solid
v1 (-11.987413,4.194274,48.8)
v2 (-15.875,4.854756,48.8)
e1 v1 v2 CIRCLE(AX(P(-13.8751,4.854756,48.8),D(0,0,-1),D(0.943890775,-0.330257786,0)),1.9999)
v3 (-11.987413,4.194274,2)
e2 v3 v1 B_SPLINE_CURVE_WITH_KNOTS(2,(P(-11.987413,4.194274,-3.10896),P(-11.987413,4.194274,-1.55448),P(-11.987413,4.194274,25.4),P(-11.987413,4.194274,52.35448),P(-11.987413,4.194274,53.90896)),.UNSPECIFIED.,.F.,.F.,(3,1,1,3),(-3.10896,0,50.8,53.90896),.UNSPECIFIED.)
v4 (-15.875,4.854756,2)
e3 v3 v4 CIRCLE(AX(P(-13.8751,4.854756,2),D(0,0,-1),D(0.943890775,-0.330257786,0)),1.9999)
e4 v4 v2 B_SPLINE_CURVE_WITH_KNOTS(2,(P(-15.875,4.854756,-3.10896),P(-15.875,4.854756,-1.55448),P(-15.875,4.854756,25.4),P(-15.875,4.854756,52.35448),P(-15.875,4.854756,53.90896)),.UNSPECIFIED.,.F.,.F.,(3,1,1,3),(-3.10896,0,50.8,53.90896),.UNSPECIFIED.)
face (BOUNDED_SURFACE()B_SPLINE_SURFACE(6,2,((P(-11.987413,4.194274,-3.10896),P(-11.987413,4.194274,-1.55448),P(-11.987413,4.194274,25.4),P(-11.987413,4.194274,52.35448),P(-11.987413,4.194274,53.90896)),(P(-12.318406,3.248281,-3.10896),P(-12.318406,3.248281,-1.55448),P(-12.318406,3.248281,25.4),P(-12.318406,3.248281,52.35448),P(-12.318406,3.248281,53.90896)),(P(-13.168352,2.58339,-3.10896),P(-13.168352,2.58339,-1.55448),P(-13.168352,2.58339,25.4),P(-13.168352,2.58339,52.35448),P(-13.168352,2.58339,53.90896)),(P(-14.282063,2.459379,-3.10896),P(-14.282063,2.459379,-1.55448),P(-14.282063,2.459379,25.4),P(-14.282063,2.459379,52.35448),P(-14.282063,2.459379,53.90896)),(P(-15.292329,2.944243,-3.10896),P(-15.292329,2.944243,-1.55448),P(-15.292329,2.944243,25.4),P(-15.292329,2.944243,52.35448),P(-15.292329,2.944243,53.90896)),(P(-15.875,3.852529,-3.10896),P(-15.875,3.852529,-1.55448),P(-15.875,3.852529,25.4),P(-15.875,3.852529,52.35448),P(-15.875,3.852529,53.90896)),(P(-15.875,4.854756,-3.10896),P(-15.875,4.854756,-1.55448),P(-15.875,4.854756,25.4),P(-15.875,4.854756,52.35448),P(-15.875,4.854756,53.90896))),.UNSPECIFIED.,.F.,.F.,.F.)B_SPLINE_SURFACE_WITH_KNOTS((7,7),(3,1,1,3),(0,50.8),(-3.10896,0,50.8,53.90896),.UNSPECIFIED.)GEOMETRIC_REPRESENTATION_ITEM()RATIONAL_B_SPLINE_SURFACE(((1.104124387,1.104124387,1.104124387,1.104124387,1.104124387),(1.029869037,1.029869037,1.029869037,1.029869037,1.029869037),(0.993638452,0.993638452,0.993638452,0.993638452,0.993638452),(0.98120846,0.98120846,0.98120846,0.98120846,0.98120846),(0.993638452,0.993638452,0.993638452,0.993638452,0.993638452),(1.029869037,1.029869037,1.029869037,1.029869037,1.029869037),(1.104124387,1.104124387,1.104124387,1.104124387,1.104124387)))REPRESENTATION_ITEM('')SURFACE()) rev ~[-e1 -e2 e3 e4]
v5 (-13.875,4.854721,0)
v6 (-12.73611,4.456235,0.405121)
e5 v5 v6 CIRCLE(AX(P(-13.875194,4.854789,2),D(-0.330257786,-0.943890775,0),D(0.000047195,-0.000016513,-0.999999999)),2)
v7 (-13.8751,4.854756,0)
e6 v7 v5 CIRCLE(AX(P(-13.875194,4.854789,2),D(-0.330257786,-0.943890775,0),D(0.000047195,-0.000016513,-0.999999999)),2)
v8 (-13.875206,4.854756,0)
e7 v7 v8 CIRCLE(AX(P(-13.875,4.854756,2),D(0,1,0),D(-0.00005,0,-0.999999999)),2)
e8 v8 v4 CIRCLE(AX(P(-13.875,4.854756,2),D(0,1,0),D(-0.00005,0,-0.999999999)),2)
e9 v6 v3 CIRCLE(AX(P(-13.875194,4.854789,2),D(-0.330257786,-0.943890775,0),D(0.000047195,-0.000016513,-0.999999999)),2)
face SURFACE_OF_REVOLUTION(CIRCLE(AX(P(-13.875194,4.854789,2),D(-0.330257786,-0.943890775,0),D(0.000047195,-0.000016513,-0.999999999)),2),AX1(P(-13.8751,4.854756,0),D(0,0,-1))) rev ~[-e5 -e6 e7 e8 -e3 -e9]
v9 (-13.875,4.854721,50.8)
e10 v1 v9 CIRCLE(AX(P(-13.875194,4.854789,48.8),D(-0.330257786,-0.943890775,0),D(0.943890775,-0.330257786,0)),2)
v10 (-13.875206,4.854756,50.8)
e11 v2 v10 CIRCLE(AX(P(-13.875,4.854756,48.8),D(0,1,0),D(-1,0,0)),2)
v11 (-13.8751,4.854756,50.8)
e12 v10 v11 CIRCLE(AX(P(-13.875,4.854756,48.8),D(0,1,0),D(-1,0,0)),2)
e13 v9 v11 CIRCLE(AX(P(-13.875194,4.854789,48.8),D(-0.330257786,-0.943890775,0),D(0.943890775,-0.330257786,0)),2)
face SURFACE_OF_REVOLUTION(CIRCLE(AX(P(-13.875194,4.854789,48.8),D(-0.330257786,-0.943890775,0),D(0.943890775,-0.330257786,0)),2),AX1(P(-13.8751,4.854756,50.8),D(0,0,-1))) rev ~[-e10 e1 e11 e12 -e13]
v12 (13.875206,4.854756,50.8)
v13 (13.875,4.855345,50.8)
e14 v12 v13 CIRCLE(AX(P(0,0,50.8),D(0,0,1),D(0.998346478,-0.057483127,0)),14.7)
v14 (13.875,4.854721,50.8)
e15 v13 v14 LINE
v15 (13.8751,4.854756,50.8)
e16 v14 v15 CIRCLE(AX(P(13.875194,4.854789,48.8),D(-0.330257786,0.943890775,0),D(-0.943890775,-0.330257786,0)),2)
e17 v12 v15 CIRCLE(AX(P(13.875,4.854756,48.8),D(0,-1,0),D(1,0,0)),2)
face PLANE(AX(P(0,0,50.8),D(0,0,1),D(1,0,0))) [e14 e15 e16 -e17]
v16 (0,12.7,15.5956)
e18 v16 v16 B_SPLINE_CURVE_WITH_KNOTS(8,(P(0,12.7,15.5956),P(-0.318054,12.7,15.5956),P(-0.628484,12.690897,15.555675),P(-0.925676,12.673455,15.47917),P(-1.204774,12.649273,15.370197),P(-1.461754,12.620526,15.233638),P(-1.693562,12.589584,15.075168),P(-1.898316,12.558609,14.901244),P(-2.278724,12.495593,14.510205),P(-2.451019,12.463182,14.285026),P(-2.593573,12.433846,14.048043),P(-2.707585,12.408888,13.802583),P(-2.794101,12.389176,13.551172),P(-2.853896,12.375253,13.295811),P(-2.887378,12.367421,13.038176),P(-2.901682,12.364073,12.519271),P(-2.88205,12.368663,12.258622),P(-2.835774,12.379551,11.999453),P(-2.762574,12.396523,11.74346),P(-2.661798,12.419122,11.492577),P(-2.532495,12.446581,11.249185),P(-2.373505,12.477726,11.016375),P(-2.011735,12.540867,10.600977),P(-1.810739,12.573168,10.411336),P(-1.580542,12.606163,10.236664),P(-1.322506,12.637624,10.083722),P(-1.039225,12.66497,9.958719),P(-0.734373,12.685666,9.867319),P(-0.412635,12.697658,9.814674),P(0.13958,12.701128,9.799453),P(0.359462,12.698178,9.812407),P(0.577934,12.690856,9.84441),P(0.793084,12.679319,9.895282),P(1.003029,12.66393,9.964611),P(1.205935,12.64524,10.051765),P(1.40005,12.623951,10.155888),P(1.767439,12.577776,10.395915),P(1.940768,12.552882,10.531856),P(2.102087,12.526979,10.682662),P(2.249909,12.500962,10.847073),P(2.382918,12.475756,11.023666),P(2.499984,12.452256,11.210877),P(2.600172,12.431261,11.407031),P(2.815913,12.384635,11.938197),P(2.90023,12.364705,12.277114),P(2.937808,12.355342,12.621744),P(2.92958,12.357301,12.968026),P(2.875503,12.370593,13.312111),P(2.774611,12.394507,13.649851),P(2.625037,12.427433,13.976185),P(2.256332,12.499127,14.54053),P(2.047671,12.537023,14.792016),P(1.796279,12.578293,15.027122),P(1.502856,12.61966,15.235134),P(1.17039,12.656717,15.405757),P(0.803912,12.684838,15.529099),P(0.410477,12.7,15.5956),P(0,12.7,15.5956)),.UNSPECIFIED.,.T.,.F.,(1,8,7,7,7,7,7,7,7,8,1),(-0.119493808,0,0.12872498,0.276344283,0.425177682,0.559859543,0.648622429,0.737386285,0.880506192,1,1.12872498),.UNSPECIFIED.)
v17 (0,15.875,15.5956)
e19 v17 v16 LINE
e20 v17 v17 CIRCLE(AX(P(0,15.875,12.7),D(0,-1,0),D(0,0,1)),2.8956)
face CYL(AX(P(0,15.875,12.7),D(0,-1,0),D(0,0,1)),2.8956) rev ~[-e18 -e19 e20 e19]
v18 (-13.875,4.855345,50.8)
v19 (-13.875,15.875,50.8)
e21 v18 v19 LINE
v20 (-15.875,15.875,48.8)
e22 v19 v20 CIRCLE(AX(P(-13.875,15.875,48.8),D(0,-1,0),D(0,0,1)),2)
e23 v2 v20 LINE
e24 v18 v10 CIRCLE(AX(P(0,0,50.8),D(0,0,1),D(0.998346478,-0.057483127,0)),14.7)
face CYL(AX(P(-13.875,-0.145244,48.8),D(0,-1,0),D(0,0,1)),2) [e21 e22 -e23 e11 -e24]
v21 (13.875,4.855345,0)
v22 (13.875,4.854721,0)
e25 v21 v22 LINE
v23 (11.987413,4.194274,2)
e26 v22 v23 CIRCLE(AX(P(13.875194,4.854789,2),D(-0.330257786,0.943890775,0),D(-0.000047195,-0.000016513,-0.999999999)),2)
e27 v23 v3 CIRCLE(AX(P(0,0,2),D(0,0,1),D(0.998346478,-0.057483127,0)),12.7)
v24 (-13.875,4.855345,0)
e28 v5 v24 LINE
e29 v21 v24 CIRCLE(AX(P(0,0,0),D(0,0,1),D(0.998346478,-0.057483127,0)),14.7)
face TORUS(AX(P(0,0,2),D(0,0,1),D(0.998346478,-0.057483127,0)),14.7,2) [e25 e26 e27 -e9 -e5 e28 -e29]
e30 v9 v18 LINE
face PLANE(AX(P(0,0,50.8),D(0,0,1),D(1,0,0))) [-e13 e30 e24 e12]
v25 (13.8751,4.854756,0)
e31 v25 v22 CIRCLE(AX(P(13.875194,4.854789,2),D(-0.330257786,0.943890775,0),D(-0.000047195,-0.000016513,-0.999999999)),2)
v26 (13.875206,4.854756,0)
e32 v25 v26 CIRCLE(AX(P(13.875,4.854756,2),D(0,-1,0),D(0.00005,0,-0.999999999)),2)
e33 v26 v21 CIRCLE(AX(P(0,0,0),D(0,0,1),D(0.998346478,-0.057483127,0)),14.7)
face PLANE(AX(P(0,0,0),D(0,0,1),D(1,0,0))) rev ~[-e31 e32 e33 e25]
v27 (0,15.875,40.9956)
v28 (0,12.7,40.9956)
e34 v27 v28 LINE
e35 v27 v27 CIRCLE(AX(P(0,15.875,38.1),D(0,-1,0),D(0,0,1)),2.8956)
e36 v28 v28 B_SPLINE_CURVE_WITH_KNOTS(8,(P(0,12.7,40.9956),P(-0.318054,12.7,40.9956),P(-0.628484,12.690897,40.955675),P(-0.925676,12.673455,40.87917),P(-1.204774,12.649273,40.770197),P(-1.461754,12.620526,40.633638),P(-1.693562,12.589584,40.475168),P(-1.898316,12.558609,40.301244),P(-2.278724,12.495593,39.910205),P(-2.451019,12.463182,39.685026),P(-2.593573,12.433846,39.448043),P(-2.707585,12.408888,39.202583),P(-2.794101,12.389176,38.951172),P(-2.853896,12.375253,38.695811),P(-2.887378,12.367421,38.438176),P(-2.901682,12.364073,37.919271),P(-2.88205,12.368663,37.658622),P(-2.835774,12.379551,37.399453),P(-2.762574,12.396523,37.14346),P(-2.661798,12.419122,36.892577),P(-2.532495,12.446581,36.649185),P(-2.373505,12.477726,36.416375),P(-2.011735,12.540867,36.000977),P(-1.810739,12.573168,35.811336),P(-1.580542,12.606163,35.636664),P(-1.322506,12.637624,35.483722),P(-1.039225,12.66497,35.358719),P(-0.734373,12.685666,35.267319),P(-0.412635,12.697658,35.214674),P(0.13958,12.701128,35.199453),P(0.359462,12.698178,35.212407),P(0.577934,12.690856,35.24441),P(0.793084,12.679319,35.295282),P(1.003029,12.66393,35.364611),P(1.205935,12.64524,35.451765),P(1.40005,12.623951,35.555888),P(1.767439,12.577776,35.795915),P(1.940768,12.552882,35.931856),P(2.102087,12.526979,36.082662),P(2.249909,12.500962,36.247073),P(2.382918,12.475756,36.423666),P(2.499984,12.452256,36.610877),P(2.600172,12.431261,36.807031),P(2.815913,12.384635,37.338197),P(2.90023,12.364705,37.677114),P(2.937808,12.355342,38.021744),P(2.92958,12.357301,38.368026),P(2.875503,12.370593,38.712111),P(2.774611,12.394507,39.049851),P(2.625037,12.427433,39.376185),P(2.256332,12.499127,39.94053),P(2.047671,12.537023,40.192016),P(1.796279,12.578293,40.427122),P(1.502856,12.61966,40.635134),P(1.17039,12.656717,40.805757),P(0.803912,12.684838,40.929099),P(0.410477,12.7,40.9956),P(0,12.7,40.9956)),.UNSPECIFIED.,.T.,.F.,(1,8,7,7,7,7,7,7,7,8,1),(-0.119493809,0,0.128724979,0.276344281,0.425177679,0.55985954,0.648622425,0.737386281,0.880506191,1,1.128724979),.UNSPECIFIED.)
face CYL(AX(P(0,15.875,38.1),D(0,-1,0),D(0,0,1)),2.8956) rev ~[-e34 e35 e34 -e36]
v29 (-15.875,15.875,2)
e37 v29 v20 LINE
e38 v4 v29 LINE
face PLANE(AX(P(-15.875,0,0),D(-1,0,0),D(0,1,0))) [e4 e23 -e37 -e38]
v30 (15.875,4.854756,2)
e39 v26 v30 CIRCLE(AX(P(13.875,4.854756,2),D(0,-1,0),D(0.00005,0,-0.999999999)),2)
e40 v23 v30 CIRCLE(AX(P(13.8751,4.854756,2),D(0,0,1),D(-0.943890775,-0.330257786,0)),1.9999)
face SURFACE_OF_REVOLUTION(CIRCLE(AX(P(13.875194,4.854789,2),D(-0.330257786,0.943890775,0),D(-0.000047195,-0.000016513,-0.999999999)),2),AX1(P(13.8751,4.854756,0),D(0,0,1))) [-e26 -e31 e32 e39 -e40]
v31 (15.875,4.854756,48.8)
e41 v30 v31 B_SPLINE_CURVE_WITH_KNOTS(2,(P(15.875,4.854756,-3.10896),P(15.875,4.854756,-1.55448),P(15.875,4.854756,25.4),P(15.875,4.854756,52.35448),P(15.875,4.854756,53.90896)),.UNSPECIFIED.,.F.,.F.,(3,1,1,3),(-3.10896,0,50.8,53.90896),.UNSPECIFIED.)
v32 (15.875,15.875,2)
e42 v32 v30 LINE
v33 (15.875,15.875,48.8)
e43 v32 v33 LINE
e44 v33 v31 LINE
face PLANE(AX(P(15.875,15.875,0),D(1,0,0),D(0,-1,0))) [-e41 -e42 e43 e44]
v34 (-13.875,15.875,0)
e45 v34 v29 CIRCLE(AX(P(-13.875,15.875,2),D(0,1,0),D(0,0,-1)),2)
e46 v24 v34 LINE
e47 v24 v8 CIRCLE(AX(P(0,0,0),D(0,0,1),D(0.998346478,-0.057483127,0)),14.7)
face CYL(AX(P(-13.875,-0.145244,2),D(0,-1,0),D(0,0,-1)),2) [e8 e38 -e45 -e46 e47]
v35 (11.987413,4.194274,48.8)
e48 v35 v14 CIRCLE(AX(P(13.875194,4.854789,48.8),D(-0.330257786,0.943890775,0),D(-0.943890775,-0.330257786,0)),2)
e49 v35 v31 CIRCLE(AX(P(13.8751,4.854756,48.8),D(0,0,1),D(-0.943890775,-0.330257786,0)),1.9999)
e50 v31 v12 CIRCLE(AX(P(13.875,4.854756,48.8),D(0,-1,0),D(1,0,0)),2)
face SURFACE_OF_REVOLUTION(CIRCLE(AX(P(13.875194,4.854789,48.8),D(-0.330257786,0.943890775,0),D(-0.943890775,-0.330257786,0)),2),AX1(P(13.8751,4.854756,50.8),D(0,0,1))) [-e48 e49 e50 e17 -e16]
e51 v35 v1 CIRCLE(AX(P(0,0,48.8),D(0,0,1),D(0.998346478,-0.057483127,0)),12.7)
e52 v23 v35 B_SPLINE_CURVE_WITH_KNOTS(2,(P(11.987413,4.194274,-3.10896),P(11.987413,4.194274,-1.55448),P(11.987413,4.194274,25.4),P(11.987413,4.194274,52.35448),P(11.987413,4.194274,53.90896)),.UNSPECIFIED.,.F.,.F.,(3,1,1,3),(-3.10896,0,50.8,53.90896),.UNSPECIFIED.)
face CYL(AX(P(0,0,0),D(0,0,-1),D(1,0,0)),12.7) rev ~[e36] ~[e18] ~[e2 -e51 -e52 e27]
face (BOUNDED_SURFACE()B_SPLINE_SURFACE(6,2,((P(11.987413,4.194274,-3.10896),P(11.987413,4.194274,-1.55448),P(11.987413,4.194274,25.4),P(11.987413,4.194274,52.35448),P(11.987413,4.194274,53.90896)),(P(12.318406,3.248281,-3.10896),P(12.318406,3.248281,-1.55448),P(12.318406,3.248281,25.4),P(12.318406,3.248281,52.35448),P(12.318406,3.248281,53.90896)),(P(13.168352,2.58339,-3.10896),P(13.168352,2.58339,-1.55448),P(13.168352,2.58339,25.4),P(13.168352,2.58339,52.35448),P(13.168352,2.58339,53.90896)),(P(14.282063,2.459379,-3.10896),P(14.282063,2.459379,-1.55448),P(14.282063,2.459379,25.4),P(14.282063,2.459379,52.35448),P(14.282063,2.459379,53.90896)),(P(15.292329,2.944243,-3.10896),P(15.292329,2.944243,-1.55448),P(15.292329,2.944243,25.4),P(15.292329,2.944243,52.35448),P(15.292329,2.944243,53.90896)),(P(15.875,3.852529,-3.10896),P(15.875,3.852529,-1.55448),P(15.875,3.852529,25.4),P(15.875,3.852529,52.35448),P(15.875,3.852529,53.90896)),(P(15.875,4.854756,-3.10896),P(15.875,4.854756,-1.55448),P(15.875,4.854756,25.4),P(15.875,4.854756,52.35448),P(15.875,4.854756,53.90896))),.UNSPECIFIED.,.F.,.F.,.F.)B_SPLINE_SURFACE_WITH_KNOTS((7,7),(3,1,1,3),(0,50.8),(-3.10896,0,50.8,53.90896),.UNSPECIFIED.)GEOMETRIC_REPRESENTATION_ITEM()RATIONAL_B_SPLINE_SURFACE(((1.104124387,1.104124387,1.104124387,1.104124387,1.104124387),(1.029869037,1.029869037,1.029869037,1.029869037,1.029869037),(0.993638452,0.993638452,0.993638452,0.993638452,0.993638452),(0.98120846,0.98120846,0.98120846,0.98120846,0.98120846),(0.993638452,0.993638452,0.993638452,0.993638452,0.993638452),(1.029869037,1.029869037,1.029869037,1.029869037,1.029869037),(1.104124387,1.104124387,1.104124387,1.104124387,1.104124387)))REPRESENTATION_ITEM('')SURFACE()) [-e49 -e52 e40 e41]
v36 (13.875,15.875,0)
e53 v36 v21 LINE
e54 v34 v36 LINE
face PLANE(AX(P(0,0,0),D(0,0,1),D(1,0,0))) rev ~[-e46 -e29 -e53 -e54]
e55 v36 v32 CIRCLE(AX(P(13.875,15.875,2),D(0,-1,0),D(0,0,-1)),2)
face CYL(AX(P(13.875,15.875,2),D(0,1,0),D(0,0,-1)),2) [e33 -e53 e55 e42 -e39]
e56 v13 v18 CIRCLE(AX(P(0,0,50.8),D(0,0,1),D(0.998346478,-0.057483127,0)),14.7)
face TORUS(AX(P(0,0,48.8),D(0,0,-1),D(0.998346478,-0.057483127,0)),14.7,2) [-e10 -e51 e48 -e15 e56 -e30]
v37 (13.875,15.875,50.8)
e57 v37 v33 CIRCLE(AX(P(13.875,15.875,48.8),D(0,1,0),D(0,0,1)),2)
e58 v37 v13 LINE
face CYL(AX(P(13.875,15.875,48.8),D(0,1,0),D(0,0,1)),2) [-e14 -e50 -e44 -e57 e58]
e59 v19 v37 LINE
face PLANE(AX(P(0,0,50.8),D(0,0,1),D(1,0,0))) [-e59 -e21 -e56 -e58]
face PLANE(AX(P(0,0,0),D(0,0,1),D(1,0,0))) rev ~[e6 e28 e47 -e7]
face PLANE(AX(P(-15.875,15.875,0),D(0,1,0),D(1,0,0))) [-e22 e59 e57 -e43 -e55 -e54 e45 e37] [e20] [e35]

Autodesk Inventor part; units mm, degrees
ref_plane "YZ Plane" through (0, 0, 0) normal (1, 0, 0) x (0, 1, 0)
ref_plane "XZ Plane" through (0, 0, 0) normal (0, 1, 0) x (-1, 0, 0)
ref_plane "XY Plane" through (0, 0, 0) normal (0, 0, 1) x (1, 0, 0)
sketch "Sketch1" plane through (0, 0, 0) normal (0, 0, 1) x (1, 0, 0)
  circle A0 centre (0, 0) radius 12.7
  line L0 (-15.875, 15.875) -> (15.875, 15.875)
  line L1 (15.875, 15.875) -> (15.875, -15.875)
  line L2 (15.875, -15.875) -> (-15.875, -15.875)
  line L3 (-15.875, -15.875) -> (-15.875, 15.875)
  line L4 (-15.875, 15.875) -> (15.875, -15.875) construction
  line L5 (15.875, 15.875) -> (-15.875, -15.875) construction
  line L6 (-15.875, 0) -> (15.875, 0)
  point P0 (-12.7, 0)
  point P1 (12.7, 0)
  dimension "d0" = 25.4
  dimension "d1" = 31.75
  dimension "d2" = 31.75
extrude "Extrusion1" add sketch "Sketch1" along normal blind 50.8 contours A0 L6 L3 L0 L1
sketch "Sketch2" plane through (-15.875, 15.875, 0) normal (0, 1, 0) x (1, 0, 0)
  line L0 (31.75, 0) -> (0, 0) construction
  line L1 (0, 0) -> (0, -50.8) construction
  line L2 (31.75, -50.8) -> (0, -50.8) construction
  line L3 (31.75, 0) -> (31.75, -50.8) construction
  line L4 (15.875, -50.8) -> (15.875, 0)
  point P0 (15.875, -38.1)
  point P1 (15.875, -12.7)
  point P2 (15.875, -25.4)
  dimension "d7" = 25.4
  dimension "d8" = 25.4
hole "Hole1" at (0, 15.875, 38.1) at (0, 15.875, 12.7) direction (0, -1, 0) diameter 5.7912 end through all clearance for "Flat Head Machine Screw (82)" size "#12" standard "Ansi Unified Screw Threads"
fillet "Fillet1" radius 2 4 edges at (15.875, 0, 25.4) (12.7, 0, 25.4) (-15.875, 0, 25.4) (-12.7, 0, 25.4)
fillet "Fillet2" radius 2 10 edges at (-14.2101, 2.8831, 50.8) (0, 12.7, 50.8) (14.2101, 2.8831, 50.8) (15.875, 10.3649, 50.8) (-15.875, 10.3649, 50.8) (-14.2101, 2.8831, 0) (0, 12.7, 0) (14.2101, 2.8831, 0) (15.875, 10.3649, 0) (-15.875, 10.3649, 0)
equation "\"d0\" = tubeOD"
equation "\"d3\" = attachmentLength"
equation "\"d8\" = d7"
equation "\"tubeOD\" = 25.4"
equation "\"attachmentLength\" = 50.8"
properties part number "Pipe Adapter" material "ABS Plastic"
